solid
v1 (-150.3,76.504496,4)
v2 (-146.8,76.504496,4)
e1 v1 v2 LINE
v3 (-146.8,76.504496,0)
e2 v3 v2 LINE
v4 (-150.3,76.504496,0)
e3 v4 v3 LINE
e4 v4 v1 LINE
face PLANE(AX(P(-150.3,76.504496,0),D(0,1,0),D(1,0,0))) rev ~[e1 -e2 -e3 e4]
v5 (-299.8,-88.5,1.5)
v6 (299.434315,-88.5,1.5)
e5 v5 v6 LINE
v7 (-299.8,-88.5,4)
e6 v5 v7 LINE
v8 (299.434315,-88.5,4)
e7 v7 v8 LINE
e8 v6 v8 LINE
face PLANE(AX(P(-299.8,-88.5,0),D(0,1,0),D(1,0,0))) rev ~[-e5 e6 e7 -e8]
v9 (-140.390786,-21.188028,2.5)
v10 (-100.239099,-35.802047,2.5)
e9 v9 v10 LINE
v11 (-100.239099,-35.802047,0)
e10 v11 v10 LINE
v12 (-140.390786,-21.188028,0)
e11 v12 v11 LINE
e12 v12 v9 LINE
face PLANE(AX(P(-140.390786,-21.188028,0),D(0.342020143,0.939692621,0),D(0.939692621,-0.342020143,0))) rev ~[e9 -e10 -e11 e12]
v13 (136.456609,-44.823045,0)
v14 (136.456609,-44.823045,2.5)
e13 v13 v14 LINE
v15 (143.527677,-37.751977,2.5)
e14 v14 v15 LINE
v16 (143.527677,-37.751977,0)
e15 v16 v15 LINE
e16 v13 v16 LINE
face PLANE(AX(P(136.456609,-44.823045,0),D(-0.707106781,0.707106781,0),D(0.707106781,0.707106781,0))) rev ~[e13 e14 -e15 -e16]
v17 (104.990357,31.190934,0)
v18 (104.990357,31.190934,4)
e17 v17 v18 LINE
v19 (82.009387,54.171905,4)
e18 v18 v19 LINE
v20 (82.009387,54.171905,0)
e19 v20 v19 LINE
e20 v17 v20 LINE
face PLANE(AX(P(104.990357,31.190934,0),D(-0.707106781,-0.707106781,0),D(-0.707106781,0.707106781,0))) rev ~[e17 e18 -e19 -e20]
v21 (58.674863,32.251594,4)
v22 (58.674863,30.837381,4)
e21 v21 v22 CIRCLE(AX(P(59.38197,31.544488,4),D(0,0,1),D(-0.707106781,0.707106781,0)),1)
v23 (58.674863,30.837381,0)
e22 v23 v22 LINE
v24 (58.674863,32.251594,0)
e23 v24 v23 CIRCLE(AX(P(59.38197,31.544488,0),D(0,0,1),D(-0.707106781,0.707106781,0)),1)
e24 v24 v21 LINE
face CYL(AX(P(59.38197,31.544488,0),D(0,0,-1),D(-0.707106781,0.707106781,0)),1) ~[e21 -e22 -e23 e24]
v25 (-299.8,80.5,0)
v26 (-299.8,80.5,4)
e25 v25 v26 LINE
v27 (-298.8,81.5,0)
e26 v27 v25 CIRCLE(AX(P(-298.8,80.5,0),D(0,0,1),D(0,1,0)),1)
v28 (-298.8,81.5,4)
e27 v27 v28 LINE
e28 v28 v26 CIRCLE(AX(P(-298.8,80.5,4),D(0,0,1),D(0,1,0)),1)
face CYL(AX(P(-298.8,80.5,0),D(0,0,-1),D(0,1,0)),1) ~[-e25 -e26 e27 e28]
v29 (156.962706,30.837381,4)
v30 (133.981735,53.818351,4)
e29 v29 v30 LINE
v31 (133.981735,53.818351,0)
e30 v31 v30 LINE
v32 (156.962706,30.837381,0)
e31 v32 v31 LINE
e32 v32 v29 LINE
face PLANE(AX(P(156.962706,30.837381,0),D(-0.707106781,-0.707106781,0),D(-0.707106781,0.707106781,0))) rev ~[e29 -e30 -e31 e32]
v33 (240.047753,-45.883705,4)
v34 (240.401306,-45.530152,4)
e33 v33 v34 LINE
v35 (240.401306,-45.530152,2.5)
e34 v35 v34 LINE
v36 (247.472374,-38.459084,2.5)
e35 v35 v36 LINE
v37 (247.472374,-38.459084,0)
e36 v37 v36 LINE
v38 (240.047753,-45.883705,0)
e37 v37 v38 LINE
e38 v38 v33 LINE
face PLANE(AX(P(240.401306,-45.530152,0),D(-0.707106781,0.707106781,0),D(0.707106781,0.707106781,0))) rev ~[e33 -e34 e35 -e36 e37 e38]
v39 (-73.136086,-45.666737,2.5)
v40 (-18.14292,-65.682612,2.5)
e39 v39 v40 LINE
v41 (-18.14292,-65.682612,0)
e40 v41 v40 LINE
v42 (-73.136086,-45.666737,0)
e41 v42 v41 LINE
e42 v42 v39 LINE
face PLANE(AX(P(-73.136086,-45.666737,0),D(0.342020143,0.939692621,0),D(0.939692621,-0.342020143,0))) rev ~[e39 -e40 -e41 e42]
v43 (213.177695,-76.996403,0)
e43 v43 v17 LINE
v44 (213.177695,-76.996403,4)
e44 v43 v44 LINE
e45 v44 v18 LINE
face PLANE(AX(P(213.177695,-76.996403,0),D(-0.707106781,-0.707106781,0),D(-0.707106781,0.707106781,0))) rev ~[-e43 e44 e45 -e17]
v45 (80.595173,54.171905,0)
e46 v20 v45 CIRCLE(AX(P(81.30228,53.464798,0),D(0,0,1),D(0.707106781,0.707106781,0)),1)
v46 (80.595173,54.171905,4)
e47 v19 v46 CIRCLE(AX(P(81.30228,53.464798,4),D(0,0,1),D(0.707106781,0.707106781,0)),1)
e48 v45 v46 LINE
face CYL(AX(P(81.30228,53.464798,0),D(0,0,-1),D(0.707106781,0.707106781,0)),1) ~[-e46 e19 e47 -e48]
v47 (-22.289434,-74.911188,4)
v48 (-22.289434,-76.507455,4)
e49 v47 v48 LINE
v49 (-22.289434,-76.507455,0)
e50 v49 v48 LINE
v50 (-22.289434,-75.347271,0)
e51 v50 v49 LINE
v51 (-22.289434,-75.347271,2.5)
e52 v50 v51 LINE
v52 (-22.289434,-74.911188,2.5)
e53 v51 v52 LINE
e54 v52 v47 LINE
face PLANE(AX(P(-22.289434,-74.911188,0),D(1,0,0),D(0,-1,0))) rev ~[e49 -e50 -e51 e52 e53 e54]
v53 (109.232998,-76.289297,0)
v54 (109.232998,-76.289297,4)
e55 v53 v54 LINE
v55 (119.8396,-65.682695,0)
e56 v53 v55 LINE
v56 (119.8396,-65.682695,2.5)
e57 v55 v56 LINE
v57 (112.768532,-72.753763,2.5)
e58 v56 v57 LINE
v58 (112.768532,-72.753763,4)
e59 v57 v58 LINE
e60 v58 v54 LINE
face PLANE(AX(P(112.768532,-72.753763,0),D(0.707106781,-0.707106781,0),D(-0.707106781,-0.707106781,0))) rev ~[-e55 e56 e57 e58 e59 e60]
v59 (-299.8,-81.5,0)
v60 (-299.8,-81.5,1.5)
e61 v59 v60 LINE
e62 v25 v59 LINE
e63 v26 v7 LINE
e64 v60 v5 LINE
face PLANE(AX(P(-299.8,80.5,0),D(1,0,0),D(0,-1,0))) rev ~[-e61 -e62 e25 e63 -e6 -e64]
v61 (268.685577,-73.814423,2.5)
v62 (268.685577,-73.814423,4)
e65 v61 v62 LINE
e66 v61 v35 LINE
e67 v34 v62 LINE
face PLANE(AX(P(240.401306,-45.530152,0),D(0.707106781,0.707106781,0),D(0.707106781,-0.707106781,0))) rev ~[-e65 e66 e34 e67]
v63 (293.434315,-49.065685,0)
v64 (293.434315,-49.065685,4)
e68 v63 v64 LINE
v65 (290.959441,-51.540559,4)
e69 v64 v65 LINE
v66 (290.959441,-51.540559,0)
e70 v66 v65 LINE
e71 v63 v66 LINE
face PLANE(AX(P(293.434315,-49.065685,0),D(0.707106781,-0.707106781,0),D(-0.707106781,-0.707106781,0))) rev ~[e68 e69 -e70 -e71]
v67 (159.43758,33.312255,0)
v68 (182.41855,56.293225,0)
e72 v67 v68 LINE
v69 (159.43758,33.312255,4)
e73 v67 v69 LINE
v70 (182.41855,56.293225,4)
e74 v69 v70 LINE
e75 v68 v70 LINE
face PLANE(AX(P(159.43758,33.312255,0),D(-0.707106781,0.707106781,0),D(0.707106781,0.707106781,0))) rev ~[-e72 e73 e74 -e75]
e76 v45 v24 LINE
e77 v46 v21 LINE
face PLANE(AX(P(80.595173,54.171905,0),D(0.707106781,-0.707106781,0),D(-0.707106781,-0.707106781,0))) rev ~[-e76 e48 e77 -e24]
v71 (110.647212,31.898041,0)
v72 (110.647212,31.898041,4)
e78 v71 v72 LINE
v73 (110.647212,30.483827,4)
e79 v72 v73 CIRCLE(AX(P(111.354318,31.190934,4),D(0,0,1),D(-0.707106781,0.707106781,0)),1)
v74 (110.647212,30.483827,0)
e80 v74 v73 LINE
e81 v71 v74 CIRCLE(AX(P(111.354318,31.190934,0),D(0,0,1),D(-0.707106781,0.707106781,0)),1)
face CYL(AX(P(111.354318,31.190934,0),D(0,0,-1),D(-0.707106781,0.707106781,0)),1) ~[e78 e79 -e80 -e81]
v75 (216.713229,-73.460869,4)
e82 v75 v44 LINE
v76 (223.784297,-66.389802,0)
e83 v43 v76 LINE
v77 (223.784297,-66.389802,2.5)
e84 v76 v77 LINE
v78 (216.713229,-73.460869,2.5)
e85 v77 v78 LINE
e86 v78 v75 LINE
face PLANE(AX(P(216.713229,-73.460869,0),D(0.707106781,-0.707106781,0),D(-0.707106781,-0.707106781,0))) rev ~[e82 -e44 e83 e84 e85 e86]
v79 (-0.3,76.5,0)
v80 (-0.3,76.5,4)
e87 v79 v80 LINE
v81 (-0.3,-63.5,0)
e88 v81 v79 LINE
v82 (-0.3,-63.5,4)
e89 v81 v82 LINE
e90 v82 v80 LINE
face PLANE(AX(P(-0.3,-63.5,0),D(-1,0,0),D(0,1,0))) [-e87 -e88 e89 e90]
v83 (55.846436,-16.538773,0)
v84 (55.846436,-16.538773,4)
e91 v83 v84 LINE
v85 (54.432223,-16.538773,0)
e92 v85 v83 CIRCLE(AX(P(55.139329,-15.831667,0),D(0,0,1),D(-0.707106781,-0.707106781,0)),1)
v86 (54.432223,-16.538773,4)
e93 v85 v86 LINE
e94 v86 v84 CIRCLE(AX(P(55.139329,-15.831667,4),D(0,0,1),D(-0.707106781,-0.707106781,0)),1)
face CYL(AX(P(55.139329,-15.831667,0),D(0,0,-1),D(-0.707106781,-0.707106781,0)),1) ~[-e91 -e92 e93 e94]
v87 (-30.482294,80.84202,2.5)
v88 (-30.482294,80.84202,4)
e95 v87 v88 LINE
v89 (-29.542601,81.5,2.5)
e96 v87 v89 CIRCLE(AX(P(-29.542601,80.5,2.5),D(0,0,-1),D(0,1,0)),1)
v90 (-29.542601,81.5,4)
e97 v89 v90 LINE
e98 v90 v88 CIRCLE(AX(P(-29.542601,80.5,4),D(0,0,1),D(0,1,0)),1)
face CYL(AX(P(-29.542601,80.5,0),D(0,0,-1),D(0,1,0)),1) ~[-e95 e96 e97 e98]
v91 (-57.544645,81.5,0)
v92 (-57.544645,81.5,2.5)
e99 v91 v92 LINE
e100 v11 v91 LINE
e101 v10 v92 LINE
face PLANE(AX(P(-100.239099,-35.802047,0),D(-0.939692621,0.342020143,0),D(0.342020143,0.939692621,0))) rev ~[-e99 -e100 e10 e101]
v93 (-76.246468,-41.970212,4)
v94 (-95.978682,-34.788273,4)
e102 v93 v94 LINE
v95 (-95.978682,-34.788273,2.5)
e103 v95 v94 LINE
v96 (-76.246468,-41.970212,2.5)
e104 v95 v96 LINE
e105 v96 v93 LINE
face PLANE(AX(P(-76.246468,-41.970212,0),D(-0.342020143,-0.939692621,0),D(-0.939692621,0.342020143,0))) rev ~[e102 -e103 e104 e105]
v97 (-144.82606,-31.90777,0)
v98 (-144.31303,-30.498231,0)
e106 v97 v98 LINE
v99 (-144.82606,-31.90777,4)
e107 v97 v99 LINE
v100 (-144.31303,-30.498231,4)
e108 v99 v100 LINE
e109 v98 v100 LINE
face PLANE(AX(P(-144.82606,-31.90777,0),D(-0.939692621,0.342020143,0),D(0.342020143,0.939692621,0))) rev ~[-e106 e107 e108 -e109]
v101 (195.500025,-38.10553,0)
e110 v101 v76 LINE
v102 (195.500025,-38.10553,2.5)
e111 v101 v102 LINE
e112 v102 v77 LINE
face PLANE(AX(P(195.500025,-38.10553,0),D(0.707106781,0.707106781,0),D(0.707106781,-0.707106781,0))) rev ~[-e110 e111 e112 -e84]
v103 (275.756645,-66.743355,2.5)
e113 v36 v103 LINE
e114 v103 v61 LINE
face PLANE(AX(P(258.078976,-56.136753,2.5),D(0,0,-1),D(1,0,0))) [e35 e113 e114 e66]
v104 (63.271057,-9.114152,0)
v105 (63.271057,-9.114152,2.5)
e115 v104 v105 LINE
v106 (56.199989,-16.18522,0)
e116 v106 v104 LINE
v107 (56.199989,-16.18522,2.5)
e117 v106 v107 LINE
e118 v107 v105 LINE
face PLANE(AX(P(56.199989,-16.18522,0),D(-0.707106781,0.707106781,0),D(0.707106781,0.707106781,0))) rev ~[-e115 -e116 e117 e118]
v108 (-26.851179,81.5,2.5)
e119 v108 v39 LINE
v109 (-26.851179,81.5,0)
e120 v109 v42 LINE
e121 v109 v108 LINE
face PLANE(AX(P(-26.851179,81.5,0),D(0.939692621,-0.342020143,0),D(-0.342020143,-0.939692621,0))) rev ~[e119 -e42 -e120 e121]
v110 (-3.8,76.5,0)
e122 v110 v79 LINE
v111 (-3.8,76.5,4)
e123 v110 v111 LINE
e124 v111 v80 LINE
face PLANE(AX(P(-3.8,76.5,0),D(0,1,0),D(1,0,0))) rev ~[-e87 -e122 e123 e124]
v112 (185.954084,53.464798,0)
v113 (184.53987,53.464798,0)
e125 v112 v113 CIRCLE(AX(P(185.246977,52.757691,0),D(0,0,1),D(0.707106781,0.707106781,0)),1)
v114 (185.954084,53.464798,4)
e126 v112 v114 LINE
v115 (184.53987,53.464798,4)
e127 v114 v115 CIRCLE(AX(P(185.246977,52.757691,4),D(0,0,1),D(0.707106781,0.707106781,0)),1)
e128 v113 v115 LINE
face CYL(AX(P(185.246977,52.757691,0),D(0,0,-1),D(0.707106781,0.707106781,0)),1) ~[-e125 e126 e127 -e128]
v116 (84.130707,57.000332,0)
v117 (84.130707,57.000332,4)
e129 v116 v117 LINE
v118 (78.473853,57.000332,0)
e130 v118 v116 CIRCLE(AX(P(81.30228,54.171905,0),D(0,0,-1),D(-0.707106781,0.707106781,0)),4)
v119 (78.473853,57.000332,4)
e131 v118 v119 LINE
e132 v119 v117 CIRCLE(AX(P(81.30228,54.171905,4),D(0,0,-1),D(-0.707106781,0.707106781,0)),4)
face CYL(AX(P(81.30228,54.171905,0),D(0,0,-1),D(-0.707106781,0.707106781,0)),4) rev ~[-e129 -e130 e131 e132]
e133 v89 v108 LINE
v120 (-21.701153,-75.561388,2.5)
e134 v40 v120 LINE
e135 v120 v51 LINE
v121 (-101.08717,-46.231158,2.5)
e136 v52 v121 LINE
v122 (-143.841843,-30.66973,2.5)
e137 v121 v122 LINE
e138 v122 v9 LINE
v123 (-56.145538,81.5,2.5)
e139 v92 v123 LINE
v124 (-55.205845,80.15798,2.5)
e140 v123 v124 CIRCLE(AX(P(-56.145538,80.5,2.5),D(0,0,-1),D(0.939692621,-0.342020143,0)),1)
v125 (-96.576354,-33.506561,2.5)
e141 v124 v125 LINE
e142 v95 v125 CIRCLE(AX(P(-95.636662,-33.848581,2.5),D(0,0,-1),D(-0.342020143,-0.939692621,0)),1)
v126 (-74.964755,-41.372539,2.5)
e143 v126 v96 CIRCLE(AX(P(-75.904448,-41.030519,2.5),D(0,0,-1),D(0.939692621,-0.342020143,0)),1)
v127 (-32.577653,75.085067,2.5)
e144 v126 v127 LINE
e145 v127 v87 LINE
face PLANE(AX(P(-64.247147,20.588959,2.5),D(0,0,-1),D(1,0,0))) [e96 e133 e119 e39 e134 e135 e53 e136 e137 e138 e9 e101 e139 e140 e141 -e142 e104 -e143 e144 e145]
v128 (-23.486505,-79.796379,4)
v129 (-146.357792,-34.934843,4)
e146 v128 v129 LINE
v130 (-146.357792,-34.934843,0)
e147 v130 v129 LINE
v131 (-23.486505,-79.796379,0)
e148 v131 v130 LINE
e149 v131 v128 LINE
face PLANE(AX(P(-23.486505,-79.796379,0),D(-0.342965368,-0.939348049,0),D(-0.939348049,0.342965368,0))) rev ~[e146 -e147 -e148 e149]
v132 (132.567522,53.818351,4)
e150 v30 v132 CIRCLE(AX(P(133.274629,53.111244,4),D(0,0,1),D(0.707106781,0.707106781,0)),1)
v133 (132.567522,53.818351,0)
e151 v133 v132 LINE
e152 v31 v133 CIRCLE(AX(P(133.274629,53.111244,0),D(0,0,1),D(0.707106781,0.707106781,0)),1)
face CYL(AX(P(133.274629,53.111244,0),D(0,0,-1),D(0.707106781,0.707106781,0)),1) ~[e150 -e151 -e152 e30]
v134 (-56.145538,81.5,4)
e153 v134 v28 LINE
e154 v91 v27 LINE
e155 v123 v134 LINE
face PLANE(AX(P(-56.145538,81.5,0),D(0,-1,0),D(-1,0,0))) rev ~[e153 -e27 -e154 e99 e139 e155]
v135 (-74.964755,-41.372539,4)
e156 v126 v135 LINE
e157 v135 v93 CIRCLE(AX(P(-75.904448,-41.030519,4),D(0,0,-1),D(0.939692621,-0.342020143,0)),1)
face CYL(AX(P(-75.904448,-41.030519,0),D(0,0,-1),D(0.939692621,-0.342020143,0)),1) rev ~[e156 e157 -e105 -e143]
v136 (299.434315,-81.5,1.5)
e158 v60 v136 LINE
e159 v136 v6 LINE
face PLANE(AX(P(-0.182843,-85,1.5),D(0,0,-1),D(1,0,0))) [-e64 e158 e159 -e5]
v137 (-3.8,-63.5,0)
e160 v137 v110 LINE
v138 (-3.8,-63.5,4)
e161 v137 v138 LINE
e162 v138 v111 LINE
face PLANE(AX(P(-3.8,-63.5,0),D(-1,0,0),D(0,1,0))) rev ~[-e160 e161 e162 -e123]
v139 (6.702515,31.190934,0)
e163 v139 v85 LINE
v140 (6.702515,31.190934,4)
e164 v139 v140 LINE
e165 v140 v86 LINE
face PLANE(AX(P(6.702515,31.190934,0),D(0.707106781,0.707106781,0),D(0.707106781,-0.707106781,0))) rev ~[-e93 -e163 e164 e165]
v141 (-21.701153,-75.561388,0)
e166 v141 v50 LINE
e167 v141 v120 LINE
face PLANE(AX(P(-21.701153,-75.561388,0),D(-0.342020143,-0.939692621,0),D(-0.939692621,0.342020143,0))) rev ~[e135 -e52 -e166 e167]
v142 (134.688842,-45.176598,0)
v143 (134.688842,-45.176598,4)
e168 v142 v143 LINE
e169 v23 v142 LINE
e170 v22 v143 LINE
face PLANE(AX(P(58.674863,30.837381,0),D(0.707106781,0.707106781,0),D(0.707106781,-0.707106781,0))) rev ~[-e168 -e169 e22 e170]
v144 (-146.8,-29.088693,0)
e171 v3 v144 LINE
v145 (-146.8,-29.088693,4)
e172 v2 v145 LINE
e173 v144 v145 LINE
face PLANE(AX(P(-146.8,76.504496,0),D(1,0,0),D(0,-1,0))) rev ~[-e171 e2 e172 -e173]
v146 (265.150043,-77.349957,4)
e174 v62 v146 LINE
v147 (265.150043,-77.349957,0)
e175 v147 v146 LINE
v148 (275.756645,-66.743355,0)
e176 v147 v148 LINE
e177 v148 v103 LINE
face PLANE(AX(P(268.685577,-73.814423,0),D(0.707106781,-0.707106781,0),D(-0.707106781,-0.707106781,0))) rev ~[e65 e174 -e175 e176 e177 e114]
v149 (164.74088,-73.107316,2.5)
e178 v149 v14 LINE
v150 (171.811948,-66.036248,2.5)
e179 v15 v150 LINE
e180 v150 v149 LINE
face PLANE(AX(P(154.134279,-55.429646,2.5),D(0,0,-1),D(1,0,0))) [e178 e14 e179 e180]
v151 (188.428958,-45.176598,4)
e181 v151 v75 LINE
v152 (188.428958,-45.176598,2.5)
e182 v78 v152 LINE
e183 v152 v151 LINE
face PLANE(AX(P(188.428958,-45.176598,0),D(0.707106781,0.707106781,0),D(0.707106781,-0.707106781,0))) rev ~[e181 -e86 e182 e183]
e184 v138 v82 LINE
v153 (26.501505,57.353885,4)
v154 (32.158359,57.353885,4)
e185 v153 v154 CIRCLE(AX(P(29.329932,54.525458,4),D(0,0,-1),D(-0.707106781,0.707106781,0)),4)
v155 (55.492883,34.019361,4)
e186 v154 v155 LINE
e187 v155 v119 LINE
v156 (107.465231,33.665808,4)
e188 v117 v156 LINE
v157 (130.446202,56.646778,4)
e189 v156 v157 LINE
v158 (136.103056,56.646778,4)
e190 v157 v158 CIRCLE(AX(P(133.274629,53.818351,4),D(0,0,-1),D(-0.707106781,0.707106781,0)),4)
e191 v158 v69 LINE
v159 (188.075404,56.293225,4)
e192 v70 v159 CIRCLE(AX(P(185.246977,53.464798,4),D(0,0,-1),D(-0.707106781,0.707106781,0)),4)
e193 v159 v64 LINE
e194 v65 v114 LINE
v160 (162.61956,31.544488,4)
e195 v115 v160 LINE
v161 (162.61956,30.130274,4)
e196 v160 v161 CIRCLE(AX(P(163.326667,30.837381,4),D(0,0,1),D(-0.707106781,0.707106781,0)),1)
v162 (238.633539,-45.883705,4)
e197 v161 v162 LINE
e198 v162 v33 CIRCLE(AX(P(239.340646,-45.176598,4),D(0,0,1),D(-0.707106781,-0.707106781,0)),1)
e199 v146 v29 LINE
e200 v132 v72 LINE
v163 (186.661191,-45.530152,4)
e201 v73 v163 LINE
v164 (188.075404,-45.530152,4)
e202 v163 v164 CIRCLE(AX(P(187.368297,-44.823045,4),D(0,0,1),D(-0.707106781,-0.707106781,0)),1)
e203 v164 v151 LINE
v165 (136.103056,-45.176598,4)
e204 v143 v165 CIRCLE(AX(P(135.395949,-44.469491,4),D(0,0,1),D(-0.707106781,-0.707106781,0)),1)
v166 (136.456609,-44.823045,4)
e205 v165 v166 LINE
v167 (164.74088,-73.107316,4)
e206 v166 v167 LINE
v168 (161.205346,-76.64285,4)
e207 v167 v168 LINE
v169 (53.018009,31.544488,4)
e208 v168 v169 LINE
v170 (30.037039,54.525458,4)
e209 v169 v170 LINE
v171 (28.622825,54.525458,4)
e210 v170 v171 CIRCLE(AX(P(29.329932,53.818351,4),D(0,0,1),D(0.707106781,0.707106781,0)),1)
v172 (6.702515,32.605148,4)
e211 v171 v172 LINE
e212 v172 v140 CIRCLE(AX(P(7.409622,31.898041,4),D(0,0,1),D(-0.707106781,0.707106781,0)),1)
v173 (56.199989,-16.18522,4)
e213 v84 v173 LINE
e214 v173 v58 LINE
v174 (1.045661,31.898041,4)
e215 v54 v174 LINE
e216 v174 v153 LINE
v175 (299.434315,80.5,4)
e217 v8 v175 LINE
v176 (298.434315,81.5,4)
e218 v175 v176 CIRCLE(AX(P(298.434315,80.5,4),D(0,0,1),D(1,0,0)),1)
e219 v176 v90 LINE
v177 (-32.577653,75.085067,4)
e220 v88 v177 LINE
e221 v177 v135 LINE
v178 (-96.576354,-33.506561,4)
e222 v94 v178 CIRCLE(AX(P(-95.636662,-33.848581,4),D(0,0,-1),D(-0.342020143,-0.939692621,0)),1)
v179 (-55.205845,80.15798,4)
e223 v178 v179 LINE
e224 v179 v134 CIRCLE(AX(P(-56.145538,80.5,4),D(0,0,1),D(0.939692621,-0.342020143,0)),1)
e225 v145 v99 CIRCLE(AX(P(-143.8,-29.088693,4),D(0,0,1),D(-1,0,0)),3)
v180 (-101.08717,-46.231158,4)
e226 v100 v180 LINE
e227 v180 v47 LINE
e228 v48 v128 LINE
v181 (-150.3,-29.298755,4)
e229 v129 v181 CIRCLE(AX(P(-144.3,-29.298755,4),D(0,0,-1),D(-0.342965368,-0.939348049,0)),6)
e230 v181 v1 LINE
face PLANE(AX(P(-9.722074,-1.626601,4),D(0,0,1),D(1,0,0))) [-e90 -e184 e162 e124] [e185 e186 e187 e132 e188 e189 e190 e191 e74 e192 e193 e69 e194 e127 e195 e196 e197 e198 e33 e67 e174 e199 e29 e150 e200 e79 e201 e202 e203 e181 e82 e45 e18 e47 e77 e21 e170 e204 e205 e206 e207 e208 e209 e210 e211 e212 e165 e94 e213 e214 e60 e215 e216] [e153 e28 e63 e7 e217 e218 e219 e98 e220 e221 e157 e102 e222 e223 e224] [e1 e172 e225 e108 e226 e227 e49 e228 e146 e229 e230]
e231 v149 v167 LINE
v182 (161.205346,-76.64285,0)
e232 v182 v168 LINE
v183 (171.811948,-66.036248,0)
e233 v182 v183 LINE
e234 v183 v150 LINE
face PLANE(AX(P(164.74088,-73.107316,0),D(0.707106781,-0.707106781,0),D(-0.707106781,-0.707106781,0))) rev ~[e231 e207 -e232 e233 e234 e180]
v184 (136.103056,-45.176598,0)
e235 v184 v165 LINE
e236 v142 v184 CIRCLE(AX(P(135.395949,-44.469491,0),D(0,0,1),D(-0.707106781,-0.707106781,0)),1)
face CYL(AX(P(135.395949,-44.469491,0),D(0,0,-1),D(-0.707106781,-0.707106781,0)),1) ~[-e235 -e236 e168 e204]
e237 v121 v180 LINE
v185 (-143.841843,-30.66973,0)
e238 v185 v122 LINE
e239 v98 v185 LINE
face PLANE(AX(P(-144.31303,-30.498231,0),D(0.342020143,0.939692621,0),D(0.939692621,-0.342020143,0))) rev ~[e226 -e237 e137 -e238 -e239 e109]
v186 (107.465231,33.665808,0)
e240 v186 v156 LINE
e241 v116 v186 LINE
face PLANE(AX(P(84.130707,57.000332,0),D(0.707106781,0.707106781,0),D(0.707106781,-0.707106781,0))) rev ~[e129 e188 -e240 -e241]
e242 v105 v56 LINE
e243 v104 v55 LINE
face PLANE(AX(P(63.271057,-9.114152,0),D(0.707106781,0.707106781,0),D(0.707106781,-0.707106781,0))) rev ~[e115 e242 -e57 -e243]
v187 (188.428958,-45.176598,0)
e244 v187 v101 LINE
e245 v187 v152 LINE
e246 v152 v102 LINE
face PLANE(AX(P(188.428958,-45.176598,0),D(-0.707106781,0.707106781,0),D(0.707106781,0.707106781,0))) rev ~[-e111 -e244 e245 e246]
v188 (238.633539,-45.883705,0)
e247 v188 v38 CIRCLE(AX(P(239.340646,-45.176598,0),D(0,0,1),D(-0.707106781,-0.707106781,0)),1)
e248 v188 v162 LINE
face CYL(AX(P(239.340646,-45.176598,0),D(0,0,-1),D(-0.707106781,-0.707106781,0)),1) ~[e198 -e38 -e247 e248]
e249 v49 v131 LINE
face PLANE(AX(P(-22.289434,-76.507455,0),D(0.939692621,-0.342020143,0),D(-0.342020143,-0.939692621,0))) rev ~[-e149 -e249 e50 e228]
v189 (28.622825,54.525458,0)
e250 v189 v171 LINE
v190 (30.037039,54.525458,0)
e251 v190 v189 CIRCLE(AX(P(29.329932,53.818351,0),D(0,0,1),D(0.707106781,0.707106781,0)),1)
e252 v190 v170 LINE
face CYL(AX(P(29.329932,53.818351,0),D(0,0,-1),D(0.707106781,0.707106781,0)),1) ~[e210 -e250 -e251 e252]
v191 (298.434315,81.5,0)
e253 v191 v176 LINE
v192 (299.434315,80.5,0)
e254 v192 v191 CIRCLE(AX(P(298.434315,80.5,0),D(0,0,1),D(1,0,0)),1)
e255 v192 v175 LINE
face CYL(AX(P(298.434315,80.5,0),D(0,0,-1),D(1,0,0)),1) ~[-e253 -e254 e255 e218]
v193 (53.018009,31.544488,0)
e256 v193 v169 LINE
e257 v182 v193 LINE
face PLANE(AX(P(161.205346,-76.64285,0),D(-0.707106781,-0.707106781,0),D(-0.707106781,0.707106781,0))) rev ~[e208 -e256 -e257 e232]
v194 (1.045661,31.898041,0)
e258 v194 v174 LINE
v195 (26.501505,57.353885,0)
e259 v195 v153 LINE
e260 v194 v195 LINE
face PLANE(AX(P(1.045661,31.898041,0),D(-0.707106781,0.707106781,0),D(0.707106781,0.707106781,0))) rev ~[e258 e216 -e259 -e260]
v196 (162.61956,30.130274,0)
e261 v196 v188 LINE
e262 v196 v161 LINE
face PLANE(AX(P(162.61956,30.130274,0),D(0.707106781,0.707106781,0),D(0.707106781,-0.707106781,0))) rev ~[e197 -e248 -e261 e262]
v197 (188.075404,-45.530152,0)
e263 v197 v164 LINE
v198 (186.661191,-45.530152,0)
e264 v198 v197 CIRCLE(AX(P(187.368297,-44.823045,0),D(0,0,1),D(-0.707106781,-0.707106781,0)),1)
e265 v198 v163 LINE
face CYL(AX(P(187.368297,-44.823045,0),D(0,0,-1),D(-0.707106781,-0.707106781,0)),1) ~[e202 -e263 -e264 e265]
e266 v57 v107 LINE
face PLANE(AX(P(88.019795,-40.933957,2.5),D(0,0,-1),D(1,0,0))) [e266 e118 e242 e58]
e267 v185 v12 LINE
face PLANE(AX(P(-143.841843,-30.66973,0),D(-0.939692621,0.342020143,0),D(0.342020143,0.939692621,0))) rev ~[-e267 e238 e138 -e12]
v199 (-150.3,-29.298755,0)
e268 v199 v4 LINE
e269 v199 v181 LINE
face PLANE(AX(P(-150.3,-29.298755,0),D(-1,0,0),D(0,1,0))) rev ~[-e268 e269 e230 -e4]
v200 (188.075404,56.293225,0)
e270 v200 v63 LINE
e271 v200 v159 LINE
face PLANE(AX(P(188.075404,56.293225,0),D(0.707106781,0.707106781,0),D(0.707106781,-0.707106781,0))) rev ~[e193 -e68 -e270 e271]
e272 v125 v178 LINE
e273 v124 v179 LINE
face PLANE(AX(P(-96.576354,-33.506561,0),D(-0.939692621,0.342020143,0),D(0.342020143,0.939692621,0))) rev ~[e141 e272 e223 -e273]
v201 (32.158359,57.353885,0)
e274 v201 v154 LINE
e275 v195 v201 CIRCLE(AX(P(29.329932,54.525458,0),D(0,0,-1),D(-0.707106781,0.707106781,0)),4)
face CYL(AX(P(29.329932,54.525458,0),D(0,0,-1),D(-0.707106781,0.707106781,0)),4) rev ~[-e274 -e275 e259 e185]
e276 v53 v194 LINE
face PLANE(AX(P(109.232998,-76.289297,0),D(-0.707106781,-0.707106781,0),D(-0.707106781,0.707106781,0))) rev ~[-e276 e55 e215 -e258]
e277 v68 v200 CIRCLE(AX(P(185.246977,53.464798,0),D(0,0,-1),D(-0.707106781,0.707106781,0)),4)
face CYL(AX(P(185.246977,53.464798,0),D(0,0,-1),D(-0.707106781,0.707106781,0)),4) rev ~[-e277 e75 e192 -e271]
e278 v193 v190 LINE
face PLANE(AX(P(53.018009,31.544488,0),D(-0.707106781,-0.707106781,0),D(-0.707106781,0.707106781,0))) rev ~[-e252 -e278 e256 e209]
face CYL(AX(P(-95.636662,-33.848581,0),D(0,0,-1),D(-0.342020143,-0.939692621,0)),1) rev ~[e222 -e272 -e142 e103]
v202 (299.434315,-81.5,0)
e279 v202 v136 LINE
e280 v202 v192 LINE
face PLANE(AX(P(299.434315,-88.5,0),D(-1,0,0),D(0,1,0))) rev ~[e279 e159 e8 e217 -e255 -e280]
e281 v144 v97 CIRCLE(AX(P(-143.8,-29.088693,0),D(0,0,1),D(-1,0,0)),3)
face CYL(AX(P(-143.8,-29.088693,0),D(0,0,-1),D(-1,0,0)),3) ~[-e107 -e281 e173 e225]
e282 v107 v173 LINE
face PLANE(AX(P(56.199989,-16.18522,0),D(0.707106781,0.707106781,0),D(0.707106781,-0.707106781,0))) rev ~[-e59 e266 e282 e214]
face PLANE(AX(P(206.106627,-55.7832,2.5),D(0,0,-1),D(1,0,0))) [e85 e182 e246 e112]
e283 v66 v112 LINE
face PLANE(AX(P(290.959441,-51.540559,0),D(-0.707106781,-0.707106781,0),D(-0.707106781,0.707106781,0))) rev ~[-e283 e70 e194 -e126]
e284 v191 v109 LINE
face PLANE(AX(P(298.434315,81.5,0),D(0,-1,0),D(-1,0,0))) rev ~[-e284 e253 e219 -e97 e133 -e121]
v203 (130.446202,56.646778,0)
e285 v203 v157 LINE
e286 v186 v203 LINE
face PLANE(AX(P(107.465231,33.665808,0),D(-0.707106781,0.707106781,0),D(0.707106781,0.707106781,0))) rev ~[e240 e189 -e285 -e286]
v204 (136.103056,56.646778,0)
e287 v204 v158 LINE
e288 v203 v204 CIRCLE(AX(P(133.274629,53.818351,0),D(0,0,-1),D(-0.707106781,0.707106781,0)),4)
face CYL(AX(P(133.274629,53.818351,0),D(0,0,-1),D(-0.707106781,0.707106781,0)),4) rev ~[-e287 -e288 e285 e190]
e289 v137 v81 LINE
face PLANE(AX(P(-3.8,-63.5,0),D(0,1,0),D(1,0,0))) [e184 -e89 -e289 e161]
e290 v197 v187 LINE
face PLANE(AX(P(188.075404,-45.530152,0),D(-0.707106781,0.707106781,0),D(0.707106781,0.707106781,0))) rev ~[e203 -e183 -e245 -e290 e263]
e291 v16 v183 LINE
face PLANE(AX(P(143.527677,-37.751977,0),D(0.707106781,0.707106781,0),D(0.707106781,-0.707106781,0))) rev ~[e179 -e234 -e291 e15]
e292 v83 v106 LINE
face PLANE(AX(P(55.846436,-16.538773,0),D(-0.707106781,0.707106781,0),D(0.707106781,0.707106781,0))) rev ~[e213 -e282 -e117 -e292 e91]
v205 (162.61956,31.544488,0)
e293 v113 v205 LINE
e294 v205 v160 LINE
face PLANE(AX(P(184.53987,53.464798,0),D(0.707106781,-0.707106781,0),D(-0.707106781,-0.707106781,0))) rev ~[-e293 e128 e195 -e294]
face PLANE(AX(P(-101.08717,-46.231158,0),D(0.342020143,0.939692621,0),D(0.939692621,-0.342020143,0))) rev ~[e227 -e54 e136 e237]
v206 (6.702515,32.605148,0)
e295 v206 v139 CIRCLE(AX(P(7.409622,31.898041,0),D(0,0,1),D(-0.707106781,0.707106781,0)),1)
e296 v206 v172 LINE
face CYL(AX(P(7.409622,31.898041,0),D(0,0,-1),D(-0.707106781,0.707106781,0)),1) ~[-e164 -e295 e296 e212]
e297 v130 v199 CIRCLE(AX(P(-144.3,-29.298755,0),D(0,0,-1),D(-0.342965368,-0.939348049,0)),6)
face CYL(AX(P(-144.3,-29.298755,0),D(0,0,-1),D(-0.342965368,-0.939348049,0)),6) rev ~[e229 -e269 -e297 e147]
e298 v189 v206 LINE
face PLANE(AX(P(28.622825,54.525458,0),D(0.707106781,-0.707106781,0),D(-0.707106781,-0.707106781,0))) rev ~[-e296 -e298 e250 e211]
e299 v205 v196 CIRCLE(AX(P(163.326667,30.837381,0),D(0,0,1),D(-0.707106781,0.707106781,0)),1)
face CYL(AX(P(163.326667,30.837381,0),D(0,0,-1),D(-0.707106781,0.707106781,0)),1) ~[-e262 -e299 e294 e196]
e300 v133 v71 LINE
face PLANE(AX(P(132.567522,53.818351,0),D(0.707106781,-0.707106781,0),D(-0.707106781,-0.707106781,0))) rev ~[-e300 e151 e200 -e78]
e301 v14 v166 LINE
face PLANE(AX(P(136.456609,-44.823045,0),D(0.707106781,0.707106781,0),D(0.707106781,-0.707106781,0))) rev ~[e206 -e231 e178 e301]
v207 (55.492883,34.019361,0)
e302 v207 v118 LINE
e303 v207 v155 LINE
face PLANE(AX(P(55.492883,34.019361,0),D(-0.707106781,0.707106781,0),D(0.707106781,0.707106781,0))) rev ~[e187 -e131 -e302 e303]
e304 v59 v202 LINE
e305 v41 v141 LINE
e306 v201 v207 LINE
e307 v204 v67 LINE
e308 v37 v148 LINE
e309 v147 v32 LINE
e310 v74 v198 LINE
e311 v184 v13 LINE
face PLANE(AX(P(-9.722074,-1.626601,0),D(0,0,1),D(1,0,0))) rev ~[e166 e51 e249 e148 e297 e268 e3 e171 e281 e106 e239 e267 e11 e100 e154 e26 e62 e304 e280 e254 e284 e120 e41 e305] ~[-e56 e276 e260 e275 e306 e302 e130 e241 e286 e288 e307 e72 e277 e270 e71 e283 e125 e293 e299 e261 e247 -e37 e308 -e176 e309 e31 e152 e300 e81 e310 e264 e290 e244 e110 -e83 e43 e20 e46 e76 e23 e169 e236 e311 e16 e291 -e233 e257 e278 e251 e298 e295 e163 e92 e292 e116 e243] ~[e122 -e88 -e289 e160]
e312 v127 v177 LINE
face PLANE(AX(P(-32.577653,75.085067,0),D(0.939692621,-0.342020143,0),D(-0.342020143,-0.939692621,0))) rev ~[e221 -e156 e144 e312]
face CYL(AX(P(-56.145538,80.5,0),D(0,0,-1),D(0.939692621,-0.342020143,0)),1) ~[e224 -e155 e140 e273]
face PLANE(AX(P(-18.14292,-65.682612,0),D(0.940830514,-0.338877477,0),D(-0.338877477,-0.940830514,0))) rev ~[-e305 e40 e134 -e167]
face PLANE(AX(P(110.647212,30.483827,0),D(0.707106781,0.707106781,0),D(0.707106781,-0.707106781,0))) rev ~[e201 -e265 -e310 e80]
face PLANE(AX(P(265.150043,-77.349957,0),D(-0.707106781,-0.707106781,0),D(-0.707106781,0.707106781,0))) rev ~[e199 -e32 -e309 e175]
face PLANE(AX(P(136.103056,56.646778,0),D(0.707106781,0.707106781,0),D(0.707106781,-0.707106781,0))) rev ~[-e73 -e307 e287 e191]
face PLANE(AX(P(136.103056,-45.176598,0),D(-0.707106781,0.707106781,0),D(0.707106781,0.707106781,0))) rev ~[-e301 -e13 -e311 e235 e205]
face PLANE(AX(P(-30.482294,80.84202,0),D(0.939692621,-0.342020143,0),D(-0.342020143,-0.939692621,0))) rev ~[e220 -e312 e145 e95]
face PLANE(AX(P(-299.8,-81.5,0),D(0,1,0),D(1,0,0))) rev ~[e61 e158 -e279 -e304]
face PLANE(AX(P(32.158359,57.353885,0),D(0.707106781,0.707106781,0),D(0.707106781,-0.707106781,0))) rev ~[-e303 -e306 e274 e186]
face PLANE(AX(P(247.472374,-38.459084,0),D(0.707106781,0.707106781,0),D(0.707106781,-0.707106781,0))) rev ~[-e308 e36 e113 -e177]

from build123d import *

# Parameters (mm, degrees)
F0_W     = 3.5
F0_H     = 140
F1_DEPTH = 4
F3_DEPTH = 2.5
F2_W     = 599.2343145751
F2_H     = 7
F4_DEPTH = 1.5


# Not quite as in the source:
# - a feature names something its author has since deleted; it is built from what else it names


with BuildPart() as f1:
    # F0 (on Top) → F1 (new body)
    with BuildSketch(Plane.XY):
        with BuildLine():
            Line((-299.8, -88.5), (299.4343145751, -88.5))
            Line((299.4343145751, -88.5), (299.4343145751, 80.5))
            ThreePointArc((299.4343145751, 80.5), (299.1414213562, 81.2071067812), (298.4343145751, 81.5))
            Line((298.4343145751, 81.5), (-29.5426009536, 81.5))
            ThreePointArc((-29.5426009536, 81.5), (-30.1161773899, 81.3191520443), (-30.4822935744, 80.8420201433))
            Line((-30.4822935744, 80.8420201433), (-32.577653202, 75.0850668809))
            Line((-32.577653202, 75.0850668809), (-74.9647554186, -41.3725393356))
            ThreePointArc((-74.9647554186, -41.3725393356), (-75.4818297777, -41.9368269793), (-76.2464681828, -41.9702118131))
            Line((-76.2464681828, -41.9702118131), (-95.9786819334, -34.7882733517))
            ThreePointArc((-95.9786819334, -34.7882733517), (-96.5429695771, -34.2711989926), (-96.5763544108, -33.5065605876))
            Line((-96.5763544108, -33.5065605876), (-55.2058449976, 80.1579798567))
            ThreePointArc((-55.2058449976, 80.1579798567), (-55.3263855741, 81.0735764364), (-56.1455376183, 81.5))
            Line((-56.1455376183, 81.5), (-175.9202302026, 81.5))
            Line((-175.9202302026, 81.5), (-202.5231668673, 81.5))
            Line((-202.5231668673, 81.5), (-298.8, 81.5))
            ThreePointArc((-298.8, 81.5), (-299.5071067812, 81.2071067812), (-299.8, 80.5))
            Line((-299.8, 80.5), (-299.8, -88.5))
        make_face()
        with BuildLine():
            ThreePointArc((182.4185499288, 56.2932249718), (185.2469770535, 57.4647978471), (188.0754041783, 56.2932249718))
            Line((188.0754041783, 56.2932249718), (293.4343145751, -49.0656854249))
            Line((293.4343145751, -49.0656854249), (290.9594408409, -51.5405591591))
            Line((290.9594408409, -51.5405591591), (185.9540838347, 53.4647978471))
            ThreePointArc((185.9540838347, 53.4647978471), (185.2469770535, 53.7576910659), (184.5398702723, 53.4647978471))
            Line((184.5398702723, 53.4647978471), (162.6195600555, 31.5444876303))
            ThreePointArc((162.6195600555, 31.5444876303), (162.3266668367, 30.8373808491), (162.6195600555, 30.1302740679))
            Line((162.6195600555, 30.1302740679), (238.6335390331, -45.8837049096))
            ThreePointArc((238.6335390331, -45.8837049096), (239.3406458143, -46.1765981284), (240.0477525955, -45.8837049096))
            Line((240.0477525955, -45.8837049096), (240.4013059861, -45.530151519))
            Line((240.4013059861, -45.530151519), (268.6855772335, -73.8144227665))
            Line((268.6855772335, -73.8144227665), (267.6249170617, -74.8750829383))
            Line((267.6249170617, -74.8750829383), (265.1500433276, -77.3499566724))
            Line((265.1500433276, -77.3499566724), (156.962705806, 30.8373808491))
            Line((156.962705806, 30.8373808491), (133.9817354175, 53.8183512377))
            ThreePointArc((133.9817354175, 53.8183512377), (133.2746286363, 54.1112444565), (132.5675218551, 53.8183512377))
            Line((132.5675218551, 53.8183512377), (110.6472116383, 31.8980410209))
            ThreePointArc((110.6472116383, 31.8980410209), (110.3543184195, 31.1909342397), (110.6472116383, 30.4838274585))
            Line((110.6472116383, 30.4838274585), (186.6611906159, -45.530151519))
            ThreePointArc((186.6611906159, -45.530151519), (187.3682973971, -45.8230447378), (188.0754041783, -45.530151519))
            Line((188.0754041783, -45.530151519), (188.4289575688, -45.1765981284))
            Line((188.4289575688, -45.1765981284), (216.7132288163, -73.4608693759))
            Line((216.7132288163, -73.4608693759), (215.6525686445, -74.5215295477))
            Line((215.6525686445, -74.5215295477), (213.1776949104, -76.9964032818))
            Line((213.1776949104, -76.9964032818), (104.9903573888, 31.1909342397))
            Line((104.9903573888, 31.1909342397), (82.0093870003, 54.1719046283))
            ThreePointArc((82.0093870003, 54.1719046283), (81.3022802191, 54.4647978471), (80.5951734379, 54.1719046283))
            Line((80.5951734379, 54.1719046283), (58.6748632211, 32.2515944115))
            ThreePointArc((58.6748632211, 32.2515944115), (58.3819700023, 31.5444876303), (58.6748632211, 30.8373808491))
            Line((58.6748632211, 30.8373808491), (134.6888421987, -45.1765981284))
            ThreePointArc((134.6888421987, -45.1765981284), (135.3959489799, -45.4694913472), (136.103055761, -45.1765981284))
            Line((136.103055761, -45.1765981284), (136.4566091516, -44.8230447378))
            Line((136.4566091516, -44.8230447378), (164.7408803991, -73.1073159853))
            Line((164.7408803991, -73.1073159853), (163.6802202273, -74.1679761571))
            Line((163.6802202273, -74.1679761571), (161.2053464932, -76.6428498912))
            Line((161.2053464932, -76.6428498912), (53.0180089716, 31.5444876303))
            Line((53.0180089716, 31.5444876303), (30.0370385831, 54.5254580189))
            ThreePointArc((30.0370385831, 54.5254580189), (29.3299318019, 54.8183512377), (28.6228250207, 54.5254580189))
            Line((28.6228250207, 54.5254580189), (6.7025148039, 32.6051478021))
            ThreePointArc((6.7025148039, 32.6051478021), (6.4096215851, 31.8980410209), (6.7025148039, 31.1909342397))
            Line((6.7025148039, 31.1909342397), (54.432222534, -16.5387734904))
            ThreePointArc((54.432222534, -16.5387734904), (55.1393293152, -16.8316667092), (55.8464360964, -16.5387734904))
            Line((55.8464360964, -16.5387734904), (56.199989487, -16.1852200998))
            Line((56.199989487, -16.1852200998), (112.7685319819, -72.7537625947))
            Line((112.7685319819, -72.7537625947), (111.7078718101, -73.8144227665))
            Line((111.7078718101, -73.8144227665), (109.232998076, -76.2892965006))
            Line((109.232998076, -76.2892965006), (1.0456605544, 31.8980410209))
            Line((1.0456605544, 31.8980410209), (26.5015046771, 57.3538851436))
            ThreePointArc((26.5015046771, 57.3538851436), (29.3299318019, 58.5254580189), (32.1583589266, 57.3538851436))
            Line((32.1583589266, 57.3538851436), (55.4928827058, 34.0193613645))
            Line((55.4928827058, 34.0193613645), (78.4738530943, 57.000331753))
            ThreePointArc((78.4738530943, 57.000331753), (81.3022802191, 58.1719046283), (84.1307073438, 57.000331753))
            Line((84.1307073438, 57.000331753), (107.465231123, 33.6658079739))
            Line((107.465231123, 33.6658079739), (130.4462015116, 56.6467783624))
            ThreePointArc((130.4462015116, 56.6467783624), (133.2746286363, 57.8183512377), (136.103055761, 56.6467783624))
            Line((136.103055761, 56.6467783624), (159.4375795402, 33.3122545833))
            Line((159.4375795402, 33.3122545833), (182.4185499288, 56.2932249718))
        make_face(mode=Mode.SUBTRACT)
        with BuildLine():
            Line((-150.3, -29.2987547707), (-150.3, 76.504496433))
            Line((-150.3, 76.504496433), (-146.8, 76.504496433))
            Line((-146.8, 76.504496433), (-146.8, -29.0886925093))
            ThreePointArc((-146.8, -29.0886925093), (-146.2574561329, -30.8094218183), (-144.82606043, -31.9077703716))
            Line((-144.82606043, -31.9077703716), (-144.313030215, -30.4982314405))
            Line((-144.313030215, -30.4982314405), (-101.0871696588, -46.2311580334))
            Line((-101.0871696588, -46.2311580334), (-69.1376205521, -57.8598429065))
            Line((-69.1376205521, -57.8598429065), (-22.2894341652, -74.9111882807))
            Line((-22.2894341652, -74.9111882807), (-22.2894341652, -76.5074549394))
            Line((-22.2894341652, -76.5074549394), (-23.4865046669, -79.7963791122))
            Line((-23.4865046669, -79.7963791122), (-146.3577922078, -34.9348430622))
            ThreePointArc((-146.3577922078, -34.9348430622), (-149.2166428204, -32.7377405771), (-150.3, -29.2987547707))
        make_face(mode=Mode.SUBTRACT)
        with Locations((-2.05, 6.5)):
            Rectangle(F0_W, F0_H, mode=Mode.SUBTRACT)
    extrude(amount=F1_DEPTH)

    # F2 (on face) → F3 (cut)
    with BuildSketch(Plane(origin=(0, 0, 0), x_dir=(1, 0, 0), z_dir=(0, 0, -1))):
        Polygon((275.7566450454, 66.7433549546), (268.6855772335, 73.8144227665), (240.4013059861, 45.530151519), (247.4723737979, 38.4590837072), align=None)
        Polygon((216.7132288163, 73.4608693759), (188.4289575688, 45.1765981284), (195.5000253807, 38.1055303166), (223.7842966282, 66.389801564), align=None)
        Polygon((164.7408803991, 73.1073159853), (136.4566091516, 44.8230447378), (143.5276769635, 37.751976926), (171.811948211, 66.0362481734), align=None)
        Polygon((119.8395997938, 65.6826947828), (112.7685319819, 72.7537625947), (56.199989487, 16.1852200998), (63.2710572988, 9.1141522879), align=None)
        with BuildLine():
            Line((-56.1455376183, -81.5), (-57.5446454063, -81.5))
            Line((-57.5446454063, -81.5), (-55.4138746932, -87.3542444202))
            Line((-55.4138746932, -87.3542444202), (-52.4068583067, -86.2597799616))
            Line((-52.4068583067, -86.2597799616), (-95.9935465755, 33.3700433199))
            Line((-95.9935465755, 33.3700433199), (-75.1543020742, 41.3004074501))
            Line((-75.1543020742, 41.3004074501), (-28.7703498409, -86.1384539359))
            Line((-28.7703498409, -86.1384539359), (-28.5940280937, -86.0677343446))
            Line((-28.5940280937, -86.0677343446), (-25.5870117072, -84.9732698859))
            Line((-25.5870117072, -84.9732698859), (-26.8511785612, -81.5))
            Line((-26.8511785612, -81.5), (-29.5426009536, -81.5))
            ThreePointArc((-29.5426009536, -81.5), (-30.1161773899, -81.3191520443), (-30.4822935744, -80.8420201433))
            Line((-30.4822935744, -80.8420201433), (-74.9647554186, 41.3725393356))
            ThreePointArc((-74.9647554186, 41.3725393356), (-75.4818297777, 41.9368269793), (-76.2464681828, 41.9702118131))
            Line((-76.2464681828, 41.9702118131), (-95.9786819334, 34.7882733517))
            ThreePointArc((-95.9786819334, 34.7882733517), (-96.5429695771, 34.2711989926), (-96.5763544108, 33.5065605876))
            Line((-96.5763544108, 33.5065605876), (-55.2058449976, -80.1579798567))
            ThreePointArc((-55.2058449976, -80.1579798567), (-55.3263855741, -81.0735764364), (-56.1455376183, -81.5))
        make_face()
        with BuildLine():
            Line((-100.2390988931, 35.8020468909), (-57.5446454063, -81.5))
            Line((-57.5446454063, -81.5), (-56.1455376183, -81.5))
            ThreePointArc((-56.1455376183, -81.5), (-55.3263855741, -81.0735764364), (-55.2058449976, -80.1579798567))
            Line((-55.2058449976, -80.1579798567), (-96.5763544108, 33.5065605876))
            ThreePointArc((-96.5763544108, 33.5065605876), (-96.5429695771, 34.2711989926), (-95.9786819334, 34.7882733517))
            Line((-95.9786819334, 34.7882733517), (-76.2464681828, 41.9702118131))
            ThreePointArc((-76.2464681828, 41.9702118131), (-75.4818297777, 41.9368269793), (-74.9647554186, 41.3725393356))
            Line((-74.9647554186, 41.3725393356), (-30.4822935744, -80.8420201433))
            ThreePointArc((-30.4822935744, -80.8420201433), (-30.1161773899, -81.3191520443), (-29.5426009536, -81.5))
            Line((-29.5426009536, -81.5), (-26.8511785612, -81.5))
            Line((-26.8511785612, -81.5), (-73.1360856122, 45.666736984))
            Line((-73.1360856122, 45.666736984), (-18.1429199874, 65.6826123595))
            Line((-18.1429199874, 65.6826123595), (-21.7011533658, 75.5613879342))
            Line((-21.7011533658, 75.5613879342), (-22.2894341652, 75.3472712338))
            Line((-22.2894341652, 75.3472712338), (-22.2894341652, 74.9111882807))
            Line((-22.2894341652, 74.9111882807), (-143.8418430652, 30.6697295378))
            Line((-143.8418430652, 30.6697295378), (-140.3907859198, 21.1880279576))
            Line((-140.3907859198, 21.1880279576), (-100.2390988931, 35.8020468909))
        make_face()
    extrude(amount=-F3_DEPTH, mode=Mode.SUBTRACT)

    # F2 (on face) → F4 (cut)
    with BuildSketch(Plane(origin=(0, 0, 0), x_dir=(1, 0, 0), z_dir=(0, 0, -1))):
        with Locations((-0.1828427125, 85)):
            Rectangle(F2_W, F2_H)
    extrude(amount=-F4_DEPTH, mode=Mode.SUBTRACT)


solid = f1.part
